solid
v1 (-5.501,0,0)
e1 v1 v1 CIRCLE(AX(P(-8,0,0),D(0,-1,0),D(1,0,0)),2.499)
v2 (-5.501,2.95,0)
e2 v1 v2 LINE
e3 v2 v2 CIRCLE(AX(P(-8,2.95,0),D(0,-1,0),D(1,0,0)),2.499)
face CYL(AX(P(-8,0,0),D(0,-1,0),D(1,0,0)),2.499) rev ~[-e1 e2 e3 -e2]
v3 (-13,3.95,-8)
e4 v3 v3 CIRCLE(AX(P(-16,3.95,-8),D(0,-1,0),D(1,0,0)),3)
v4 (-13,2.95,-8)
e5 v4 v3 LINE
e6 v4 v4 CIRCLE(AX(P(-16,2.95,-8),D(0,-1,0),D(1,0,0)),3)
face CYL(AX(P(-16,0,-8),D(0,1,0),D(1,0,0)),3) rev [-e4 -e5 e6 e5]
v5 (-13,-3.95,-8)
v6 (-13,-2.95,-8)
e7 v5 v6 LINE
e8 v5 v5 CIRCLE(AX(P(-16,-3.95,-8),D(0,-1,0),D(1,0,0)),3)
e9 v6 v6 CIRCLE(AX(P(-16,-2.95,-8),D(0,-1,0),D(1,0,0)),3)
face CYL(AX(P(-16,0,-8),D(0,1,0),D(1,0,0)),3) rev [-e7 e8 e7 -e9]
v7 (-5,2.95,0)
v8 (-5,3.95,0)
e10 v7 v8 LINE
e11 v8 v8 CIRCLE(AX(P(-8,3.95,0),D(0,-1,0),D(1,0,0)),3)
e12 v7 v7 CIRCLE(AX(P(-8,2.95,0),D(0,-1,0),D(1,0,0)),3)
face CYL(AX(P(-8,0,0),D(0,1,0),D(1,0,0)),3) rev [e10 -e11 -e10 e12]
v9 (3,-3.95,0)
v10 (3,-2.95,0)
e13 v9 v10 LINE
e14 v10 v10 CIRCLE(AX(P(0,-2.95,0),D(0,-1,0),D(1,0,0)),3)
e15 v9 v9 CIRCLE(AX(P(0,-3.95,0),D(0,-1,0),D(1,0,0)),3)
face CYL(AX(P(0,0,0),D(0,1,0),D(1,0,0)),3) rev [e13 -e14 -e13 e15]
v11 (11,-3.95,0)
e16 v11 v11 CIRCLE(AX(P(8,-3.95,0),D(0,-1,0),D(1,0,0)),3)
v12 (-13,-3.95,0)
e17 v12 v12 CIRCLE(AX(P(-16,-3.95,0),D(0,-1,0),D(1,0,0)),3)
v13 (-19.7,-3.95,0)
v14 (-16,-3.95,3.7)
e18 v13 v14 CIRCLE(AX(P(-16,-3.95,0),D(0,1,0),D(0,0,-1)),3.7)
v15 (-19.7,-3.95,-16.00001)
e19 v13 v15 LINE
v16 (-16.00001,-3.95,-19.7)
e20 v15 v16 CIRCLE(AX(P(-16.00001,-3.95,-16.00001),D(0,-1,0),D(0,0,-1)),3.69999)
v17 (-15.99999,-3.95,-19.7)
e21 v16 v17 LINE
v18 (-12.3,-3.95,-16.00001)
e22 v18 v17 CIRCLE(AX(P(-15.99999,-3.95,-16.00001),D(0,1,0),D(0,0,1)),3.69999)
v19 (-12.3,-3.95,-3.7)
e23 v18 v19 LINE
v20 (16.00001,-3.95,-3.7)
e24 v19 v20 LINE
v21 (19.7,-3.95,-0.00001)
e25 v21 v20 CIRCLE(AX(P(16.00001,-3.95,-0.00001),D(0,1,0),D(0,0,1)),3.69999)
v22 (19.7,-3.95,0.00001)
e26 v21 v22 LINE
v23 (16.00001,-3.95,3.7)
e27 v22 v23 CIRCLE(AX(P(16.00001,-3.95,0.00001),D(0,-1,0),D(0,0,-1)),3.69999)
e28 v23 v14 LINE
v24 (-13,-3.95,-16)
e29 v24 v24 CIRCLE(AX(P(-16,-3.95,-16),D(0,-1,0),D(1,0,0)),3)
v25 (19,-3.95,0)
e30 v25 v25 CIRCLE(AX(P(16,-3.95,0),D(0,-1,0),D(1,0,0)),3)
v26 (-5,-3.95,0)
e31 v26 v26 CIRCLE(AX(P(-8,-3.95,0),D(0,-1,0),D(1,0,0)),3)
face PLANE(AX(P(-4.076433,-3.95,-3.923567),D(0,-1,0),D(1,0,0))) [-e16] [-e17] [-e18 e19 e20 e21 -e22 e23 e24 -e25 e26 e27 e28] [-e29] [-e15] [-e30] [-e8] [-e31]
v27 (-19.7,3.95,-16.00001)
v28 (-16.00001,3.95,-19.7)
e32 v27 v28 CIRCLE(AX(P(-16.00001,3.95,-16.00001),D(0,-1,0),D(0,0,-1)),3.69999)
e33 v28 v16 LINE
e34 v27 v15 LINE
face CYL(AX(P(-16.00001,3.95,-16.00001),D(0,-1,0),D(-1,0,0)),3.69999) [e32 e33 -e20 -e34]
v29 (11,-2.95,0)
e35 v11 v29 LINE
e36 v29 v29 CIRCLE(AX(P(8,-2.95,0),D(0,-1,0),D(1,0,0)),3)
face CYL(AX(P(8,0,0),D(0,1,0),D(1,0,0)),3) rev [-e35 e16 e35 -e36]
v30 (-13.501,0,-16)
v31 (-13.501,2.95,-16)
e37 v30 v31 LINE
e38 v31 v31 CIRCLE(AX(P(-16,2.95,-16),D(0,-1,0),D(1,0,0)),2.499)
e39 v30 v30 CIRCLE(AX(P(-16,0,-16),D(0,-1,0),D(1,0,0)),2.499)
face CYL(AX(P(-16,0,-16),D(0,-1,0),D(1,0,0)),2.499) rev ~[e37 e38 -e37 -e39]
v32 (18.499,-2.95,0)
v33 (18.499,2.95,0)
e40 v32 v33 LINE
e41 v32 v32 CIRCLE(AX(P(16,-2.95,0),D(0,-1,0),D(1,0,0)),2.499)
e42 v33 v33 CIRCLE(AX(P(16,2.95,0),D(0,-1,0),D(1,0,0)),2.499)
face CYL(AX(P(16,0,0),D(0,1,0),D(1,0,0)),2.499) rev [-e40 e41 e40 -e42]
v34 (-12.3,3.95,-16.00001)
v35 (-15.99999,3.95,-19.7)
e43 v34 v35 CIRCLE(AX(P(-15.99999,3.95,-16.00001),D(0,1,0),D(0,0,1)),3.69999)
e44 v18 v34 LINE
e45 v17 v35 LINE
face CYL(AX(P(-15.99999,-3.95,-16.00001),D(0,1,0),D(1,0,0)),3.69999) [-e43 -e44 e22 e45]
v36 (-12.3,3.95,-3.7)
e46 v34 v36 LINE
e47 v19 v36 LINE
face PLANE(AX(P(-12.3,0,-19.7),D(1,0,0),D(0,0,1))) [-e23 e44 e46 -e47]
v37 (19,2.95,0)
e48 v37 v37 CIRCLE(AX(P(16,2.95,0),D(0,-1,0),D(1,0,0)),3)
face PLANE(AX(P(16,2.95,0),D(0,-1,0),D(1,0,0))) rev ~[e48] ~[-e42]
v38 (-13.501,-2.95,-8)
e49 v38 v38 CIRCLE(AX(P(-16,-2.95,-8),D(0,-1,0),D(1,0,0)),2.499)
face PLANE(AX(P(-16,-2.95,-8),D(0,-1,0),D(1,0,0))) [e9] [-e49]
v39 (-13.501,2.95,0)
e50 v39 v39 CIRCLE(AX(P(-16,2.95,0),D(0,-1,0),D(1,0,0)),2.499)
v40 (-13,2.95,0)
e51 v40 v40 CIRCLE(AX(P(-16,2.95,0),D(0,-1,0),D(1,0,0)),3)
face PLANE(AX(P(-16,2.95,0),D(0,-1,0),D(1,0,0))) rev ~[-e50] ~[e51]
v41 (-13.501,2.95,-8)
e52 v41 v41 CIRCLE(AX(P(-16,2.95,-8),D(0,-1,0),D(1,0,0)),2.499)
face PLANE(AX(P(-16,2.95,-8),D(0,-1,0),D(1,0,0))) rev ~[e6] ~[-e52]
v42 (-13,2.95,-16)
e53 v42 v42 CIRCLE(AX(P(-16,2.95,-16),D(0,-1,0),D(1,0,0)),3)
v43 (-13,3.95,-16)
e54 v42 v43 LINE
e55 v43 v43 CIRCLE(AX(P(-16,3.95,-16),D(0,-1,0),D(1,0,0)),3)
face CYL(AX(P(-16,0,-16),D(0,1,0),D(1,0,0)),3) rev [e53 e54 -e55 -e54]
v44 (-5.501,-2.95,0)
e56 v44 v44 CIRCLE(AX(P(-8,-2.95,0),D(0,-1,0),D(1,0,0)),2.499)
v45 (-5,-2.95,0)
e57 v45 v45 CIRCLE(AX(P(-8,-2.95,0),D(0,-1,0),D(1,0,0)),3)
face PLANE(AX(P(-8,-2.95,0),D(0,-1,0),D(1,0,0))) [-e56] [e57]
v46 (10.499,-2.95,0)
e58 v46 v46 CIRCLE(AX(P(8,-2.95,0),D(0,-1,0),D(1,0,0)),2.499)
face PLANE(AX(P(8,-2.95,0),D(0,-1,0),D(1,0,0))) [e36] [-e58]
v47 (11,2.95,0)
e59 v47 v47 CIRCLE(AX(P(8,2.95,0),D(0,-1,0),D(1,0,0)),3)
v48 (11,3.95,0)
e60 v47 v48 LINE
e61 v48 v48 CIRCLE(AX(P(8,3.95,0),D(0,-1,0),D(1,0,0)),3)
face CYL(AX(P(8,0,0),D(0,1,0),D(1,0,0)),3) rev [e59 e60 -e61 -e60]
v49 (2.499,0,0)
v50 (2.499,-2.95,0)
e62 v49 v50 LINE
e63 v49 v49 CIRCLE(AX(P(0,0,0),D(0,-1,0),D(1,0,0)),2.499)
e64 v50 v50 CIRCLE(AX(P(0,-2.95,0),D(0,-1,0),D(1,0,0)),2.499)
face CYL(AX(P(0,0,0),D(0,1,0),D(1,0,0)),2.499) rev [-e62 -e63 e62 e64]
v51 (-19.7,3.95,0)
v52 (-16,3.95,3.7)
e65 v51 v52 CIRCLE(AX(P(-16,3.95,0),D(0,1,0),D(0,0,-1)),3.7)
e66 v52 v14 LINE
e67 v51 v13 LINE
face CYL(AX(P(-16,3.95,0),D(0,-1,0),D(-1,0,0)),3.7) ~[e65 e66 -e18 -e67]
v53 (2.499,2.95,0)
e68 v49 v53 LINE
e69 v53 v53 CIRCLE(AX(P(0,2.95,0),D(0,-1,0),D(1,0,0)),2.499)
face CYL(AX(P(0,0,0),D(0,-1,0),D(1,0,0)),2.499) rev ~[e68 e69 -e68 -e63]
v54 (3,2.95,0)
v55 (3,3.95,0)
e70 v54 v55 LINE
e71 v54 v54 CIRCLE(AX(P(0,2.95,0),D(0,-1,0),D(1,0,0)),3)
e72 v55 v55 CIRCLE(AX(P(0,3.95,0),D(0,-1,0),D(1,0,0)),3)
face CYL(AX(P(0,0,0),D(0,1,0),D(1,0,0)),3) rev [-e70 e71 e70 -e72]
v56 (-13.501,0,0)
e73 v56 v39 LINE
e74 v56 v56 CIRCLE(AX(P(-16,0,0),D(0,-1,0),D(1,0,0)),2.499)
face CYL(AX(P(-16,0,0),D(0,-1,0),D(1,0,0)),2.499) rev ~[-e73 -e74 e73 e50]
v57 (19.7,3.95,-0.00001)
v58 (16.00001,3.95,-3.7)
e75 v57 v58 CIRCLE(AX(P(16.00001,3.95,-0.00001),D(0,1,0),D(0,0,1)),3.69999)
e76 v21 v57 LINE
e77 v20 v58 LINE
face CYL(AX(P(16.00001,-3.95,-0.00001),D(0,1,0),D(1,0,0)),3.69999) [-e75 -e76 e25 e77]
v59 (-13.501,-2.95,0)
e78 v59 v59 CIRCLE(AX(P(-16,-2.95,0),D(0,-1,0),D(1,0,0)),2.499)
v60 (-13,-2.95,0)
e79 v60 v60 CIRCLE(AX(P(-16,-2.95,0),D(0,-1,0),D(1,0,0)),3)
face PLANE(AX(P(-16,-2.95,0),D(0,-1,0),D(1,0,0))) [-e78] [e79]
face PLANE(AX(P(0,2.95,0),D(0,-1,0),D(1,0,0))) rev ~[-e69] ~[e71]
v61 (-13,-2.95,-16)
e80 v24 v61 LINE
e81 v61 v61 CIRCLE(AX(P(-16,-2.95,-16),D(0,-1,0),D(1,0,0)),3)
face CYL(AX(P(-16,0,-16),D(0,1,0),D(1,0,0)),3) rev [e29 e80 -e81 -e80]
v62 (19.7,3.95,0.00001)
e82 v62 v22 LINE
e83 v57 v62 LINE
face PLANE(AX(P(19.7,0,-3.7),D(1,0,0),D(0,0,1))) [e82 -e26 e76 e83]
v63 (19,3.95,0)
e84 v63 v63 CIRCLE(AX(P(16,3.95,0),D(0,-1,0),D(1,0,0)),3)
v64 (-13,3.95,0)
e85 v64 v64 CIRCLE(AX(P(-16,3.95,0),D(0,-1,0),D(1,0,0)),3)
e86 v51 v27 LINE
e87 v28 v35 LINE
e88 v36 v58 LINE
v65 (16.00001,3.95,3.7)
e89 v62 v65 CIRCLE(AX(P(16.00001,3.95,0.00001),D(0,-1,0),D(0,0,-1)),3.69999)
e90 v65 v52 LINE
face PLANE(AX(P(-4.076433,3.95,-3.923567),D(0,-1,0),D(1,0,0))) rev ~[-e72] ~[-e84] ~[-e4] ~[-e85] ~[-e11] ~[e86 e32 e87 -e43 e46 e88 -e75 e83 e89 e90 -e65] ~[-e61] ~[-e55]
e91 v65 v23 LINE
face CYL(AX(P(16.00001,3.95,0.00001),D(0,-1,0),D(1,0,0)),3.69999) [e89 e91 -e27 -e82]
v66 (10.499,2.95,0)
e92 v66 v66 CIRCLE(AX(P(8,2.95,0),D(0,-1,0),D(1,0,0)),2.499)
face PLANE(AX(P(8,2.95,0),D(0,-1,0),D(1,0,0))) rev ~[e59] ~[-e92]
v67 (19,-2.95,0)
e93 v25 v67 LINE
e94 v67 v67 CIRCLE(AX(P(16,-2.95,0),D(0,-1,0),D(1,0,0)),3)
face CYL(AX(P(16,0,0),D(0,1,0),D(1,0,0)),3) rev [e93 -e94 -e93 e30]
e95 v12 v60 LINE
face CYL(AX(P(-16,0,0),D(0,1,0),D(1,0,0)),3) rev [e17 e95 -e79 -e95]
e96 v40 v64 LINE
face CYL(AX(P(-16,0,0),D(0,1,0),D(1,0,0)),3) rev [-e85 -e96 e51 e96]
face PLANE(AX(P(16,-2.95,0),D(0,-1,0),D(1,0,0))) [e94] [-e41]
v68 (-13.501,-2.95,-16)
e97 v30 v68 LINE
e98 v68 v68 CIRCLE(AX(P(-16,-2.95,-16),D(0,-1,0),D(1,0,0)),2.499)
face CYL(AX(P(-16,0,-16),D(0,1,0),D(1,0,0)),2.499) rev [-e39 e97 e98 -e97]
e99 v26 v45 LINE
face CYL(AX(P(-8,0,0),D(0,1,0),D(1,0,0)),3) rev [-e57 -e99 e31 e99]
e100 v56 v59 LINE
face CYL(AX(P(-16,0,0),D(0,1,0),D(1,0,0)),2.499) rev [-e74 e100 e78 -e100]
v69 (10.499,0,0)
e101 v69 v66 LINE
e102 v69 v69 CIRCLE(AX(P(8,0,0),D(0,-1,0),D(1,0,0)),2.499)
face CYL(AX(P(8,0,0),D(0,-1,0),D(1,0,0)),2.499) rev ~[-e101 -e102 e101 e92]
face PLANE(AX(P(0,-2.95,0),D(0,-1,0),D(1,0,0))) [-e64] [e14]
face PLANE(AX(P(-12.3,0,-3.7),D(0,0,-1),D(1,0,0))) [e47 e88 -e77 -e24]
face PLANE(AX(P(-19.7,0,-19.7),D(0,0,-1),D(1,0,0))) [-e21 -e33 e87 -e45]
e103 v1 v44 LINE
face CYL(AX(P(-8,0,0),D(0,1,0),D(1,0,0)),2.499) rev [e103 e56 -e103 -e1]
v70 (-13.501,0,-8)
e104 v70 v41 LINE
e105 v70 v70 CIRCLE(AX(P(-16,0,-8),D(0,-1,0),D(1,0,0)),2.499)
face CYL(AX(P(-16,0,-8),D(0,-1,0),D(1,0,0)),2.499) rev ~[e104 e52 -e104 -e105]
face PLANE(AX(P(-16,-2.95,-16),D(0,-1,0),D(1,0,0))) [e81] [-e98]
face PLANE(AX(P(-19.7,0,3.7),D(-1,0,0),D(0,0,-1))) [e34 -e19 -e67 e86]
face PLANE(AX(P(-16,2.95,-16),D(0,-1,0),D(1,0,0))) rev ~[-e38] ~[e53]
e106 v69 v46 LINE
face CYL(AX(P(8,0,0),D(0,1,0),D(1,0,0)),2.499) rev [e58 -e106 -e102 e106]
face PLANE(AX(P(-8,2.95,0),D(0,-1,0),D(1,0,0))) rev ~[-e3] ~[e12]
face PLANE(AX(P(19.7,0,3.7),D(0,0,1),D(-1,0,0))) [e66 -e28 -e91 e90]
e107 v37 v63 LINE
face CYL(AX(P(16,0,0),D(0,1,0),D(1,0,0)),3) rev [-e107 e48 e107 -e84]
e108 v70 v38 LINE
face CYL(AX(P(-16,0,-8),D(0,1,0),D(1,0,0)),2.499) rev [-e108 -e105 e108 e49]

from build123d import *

# Parameters (mm, degrees)
F0_R     = 3
F1_DEPTH = 3.95
F0_R_2   = 2.499
F2_DEPTH = 2.95
F3_R     = 3.69999
F4_R     = 3
F4_W     = 7.4
F4_H     = 7.4
F5_DEPTH = 7.9
F7_R     = 3.69999
F8_R     = 3.7


# Not quite as in the source:
# - a fillet or chamfer is up to 0.001 mm smaller than in the source, because OpenCascade refuses the exact size


with BuildPart() as f1:
    # F0 (on Front) → F1 (new body, symmetric)
    with BuildSketch(Plane.XZ):
        Polygon((19.7, -3.7), (19.7, 3.7), (-19.7, 3.7), (-19.7, -3.7), (-19.7, -19.7), (-12.3, -19.7), (-12.3, -3.7), align=None)
        with Locations((-16, -16)):
            Circle(F0_R, mode=Mode.SUBTRACT)
        with Locations((-16, -8)):
            Circle(F0_R, mode=Mode.SUBTRACT)
        with Locations((-16, 0)):
            Circle(F0_R, mode=Mode.SUBTRACT)
        with Locations((-8, 0)):
            Circle(F0_R, mode=Mode.SUBTRACT)
        Circle(F0_R, mode=Mode.SUBTRACT)
        with Locations((8, 0)):
            Circle(F0_R, mode=Mode.SUBTRACT)
        with Locations((16, 0)):
            Circle(F0_R, mode=Mode.SUBTRACT)
    extrude(amount=F1_DEPTH, both=True)

    # F0 (on Front) → F2 (join, symmetric)
    with BuildSketch(Plane.XZ):
        with Locations((-16, -16)):
            Circle(F0_R)
        with Locations((-16, -16)):
            Circle(F0_R_2, mode=Mode.SUBTRACT)
        with Locations((-16, -8)):
            Circle(F0_R)
        with Locations((-16, -8)):
            Circle(F0_R_2, mode=Mode.SUBTRACT)
        with Locations((-16, 0)):
            Circle(F0_R)
        with Locations((-16, 0)):
            Circle(F0_R_2, mode=Mode.SUBTRACT)
        with Locations((-8, 0)):
            Circle(F0_R)
        with Locations((-8, 0)):
            Circle(F0_R_2, mode=Mode.SUBTRACT)
        Circle(F0_R)
        Circle(F0_R_2, mode=Mode.SUBTRACT)
        with Locations((8, 0)):
            Circle(F0_R)
        with Locations((8, 0)):
            Circle(F0_R_2, mode=Mode.SUBTRACT)
        with Locations((16, 0)):
            Circle(F0_R)
        with Locations((16, 0)):
            Circle(F0_R_2, mode=Mode.SUBTRACT)
    extrude(amount=F2_DEPTH, both=True)

    # F3 (radius 3.7 in the source; OpenCascade refuses exactly that, so slightly less here)
    f3_edges = [f1.edges().sort_by_distance(p)[0] for p in [
        (19.7, 0, 3.7),
        (19.7, 0, -3.7),
    ]]
    fillet(f3_edges, radius=F3_R)

    # F7 (radius 3.7 in the source; OpenCascade refuses exactly that, so slightly less here)
    f7_edges = [f1.edges().sort_by_distance(p)[0] for p in [
        (-12.3, 0, -19.7),
        (-19.7, 0, -19.7),
    ]]
    fillet(f7_edges, radius=F7_R)

    # F8
    f8_edges = [f1.edges().sort_by_distance(p)[0] for p in [
        (-19.7, 0, 3.7),
    ]]
    fillet(f8_edges, radius=F8_R)


with BuildPart() as f5:
    # F4 (on face) → F5 (new body)
    with BuildSketch(Plane.XZ.offset(3.95)):
        Polygon((-12.3, -19.7), (-12.3, -3.7), (-19.7, -3.7), (-19.7, -12.3), (-19.7, -19.7), align=None)
        with Locations((-16, -16)):
            Circle(F4_R, mode=Mode.SUBTRACT)
        with Locations((-16, -8)):
            Circle(F4_R, mode=Mode.SUBTRACT)
        with Locations((-23.4, -16)):
            Rectangle(F4_W, F4_H)
    extrude(amount=F5_DEPTH)


solid = f1.part
